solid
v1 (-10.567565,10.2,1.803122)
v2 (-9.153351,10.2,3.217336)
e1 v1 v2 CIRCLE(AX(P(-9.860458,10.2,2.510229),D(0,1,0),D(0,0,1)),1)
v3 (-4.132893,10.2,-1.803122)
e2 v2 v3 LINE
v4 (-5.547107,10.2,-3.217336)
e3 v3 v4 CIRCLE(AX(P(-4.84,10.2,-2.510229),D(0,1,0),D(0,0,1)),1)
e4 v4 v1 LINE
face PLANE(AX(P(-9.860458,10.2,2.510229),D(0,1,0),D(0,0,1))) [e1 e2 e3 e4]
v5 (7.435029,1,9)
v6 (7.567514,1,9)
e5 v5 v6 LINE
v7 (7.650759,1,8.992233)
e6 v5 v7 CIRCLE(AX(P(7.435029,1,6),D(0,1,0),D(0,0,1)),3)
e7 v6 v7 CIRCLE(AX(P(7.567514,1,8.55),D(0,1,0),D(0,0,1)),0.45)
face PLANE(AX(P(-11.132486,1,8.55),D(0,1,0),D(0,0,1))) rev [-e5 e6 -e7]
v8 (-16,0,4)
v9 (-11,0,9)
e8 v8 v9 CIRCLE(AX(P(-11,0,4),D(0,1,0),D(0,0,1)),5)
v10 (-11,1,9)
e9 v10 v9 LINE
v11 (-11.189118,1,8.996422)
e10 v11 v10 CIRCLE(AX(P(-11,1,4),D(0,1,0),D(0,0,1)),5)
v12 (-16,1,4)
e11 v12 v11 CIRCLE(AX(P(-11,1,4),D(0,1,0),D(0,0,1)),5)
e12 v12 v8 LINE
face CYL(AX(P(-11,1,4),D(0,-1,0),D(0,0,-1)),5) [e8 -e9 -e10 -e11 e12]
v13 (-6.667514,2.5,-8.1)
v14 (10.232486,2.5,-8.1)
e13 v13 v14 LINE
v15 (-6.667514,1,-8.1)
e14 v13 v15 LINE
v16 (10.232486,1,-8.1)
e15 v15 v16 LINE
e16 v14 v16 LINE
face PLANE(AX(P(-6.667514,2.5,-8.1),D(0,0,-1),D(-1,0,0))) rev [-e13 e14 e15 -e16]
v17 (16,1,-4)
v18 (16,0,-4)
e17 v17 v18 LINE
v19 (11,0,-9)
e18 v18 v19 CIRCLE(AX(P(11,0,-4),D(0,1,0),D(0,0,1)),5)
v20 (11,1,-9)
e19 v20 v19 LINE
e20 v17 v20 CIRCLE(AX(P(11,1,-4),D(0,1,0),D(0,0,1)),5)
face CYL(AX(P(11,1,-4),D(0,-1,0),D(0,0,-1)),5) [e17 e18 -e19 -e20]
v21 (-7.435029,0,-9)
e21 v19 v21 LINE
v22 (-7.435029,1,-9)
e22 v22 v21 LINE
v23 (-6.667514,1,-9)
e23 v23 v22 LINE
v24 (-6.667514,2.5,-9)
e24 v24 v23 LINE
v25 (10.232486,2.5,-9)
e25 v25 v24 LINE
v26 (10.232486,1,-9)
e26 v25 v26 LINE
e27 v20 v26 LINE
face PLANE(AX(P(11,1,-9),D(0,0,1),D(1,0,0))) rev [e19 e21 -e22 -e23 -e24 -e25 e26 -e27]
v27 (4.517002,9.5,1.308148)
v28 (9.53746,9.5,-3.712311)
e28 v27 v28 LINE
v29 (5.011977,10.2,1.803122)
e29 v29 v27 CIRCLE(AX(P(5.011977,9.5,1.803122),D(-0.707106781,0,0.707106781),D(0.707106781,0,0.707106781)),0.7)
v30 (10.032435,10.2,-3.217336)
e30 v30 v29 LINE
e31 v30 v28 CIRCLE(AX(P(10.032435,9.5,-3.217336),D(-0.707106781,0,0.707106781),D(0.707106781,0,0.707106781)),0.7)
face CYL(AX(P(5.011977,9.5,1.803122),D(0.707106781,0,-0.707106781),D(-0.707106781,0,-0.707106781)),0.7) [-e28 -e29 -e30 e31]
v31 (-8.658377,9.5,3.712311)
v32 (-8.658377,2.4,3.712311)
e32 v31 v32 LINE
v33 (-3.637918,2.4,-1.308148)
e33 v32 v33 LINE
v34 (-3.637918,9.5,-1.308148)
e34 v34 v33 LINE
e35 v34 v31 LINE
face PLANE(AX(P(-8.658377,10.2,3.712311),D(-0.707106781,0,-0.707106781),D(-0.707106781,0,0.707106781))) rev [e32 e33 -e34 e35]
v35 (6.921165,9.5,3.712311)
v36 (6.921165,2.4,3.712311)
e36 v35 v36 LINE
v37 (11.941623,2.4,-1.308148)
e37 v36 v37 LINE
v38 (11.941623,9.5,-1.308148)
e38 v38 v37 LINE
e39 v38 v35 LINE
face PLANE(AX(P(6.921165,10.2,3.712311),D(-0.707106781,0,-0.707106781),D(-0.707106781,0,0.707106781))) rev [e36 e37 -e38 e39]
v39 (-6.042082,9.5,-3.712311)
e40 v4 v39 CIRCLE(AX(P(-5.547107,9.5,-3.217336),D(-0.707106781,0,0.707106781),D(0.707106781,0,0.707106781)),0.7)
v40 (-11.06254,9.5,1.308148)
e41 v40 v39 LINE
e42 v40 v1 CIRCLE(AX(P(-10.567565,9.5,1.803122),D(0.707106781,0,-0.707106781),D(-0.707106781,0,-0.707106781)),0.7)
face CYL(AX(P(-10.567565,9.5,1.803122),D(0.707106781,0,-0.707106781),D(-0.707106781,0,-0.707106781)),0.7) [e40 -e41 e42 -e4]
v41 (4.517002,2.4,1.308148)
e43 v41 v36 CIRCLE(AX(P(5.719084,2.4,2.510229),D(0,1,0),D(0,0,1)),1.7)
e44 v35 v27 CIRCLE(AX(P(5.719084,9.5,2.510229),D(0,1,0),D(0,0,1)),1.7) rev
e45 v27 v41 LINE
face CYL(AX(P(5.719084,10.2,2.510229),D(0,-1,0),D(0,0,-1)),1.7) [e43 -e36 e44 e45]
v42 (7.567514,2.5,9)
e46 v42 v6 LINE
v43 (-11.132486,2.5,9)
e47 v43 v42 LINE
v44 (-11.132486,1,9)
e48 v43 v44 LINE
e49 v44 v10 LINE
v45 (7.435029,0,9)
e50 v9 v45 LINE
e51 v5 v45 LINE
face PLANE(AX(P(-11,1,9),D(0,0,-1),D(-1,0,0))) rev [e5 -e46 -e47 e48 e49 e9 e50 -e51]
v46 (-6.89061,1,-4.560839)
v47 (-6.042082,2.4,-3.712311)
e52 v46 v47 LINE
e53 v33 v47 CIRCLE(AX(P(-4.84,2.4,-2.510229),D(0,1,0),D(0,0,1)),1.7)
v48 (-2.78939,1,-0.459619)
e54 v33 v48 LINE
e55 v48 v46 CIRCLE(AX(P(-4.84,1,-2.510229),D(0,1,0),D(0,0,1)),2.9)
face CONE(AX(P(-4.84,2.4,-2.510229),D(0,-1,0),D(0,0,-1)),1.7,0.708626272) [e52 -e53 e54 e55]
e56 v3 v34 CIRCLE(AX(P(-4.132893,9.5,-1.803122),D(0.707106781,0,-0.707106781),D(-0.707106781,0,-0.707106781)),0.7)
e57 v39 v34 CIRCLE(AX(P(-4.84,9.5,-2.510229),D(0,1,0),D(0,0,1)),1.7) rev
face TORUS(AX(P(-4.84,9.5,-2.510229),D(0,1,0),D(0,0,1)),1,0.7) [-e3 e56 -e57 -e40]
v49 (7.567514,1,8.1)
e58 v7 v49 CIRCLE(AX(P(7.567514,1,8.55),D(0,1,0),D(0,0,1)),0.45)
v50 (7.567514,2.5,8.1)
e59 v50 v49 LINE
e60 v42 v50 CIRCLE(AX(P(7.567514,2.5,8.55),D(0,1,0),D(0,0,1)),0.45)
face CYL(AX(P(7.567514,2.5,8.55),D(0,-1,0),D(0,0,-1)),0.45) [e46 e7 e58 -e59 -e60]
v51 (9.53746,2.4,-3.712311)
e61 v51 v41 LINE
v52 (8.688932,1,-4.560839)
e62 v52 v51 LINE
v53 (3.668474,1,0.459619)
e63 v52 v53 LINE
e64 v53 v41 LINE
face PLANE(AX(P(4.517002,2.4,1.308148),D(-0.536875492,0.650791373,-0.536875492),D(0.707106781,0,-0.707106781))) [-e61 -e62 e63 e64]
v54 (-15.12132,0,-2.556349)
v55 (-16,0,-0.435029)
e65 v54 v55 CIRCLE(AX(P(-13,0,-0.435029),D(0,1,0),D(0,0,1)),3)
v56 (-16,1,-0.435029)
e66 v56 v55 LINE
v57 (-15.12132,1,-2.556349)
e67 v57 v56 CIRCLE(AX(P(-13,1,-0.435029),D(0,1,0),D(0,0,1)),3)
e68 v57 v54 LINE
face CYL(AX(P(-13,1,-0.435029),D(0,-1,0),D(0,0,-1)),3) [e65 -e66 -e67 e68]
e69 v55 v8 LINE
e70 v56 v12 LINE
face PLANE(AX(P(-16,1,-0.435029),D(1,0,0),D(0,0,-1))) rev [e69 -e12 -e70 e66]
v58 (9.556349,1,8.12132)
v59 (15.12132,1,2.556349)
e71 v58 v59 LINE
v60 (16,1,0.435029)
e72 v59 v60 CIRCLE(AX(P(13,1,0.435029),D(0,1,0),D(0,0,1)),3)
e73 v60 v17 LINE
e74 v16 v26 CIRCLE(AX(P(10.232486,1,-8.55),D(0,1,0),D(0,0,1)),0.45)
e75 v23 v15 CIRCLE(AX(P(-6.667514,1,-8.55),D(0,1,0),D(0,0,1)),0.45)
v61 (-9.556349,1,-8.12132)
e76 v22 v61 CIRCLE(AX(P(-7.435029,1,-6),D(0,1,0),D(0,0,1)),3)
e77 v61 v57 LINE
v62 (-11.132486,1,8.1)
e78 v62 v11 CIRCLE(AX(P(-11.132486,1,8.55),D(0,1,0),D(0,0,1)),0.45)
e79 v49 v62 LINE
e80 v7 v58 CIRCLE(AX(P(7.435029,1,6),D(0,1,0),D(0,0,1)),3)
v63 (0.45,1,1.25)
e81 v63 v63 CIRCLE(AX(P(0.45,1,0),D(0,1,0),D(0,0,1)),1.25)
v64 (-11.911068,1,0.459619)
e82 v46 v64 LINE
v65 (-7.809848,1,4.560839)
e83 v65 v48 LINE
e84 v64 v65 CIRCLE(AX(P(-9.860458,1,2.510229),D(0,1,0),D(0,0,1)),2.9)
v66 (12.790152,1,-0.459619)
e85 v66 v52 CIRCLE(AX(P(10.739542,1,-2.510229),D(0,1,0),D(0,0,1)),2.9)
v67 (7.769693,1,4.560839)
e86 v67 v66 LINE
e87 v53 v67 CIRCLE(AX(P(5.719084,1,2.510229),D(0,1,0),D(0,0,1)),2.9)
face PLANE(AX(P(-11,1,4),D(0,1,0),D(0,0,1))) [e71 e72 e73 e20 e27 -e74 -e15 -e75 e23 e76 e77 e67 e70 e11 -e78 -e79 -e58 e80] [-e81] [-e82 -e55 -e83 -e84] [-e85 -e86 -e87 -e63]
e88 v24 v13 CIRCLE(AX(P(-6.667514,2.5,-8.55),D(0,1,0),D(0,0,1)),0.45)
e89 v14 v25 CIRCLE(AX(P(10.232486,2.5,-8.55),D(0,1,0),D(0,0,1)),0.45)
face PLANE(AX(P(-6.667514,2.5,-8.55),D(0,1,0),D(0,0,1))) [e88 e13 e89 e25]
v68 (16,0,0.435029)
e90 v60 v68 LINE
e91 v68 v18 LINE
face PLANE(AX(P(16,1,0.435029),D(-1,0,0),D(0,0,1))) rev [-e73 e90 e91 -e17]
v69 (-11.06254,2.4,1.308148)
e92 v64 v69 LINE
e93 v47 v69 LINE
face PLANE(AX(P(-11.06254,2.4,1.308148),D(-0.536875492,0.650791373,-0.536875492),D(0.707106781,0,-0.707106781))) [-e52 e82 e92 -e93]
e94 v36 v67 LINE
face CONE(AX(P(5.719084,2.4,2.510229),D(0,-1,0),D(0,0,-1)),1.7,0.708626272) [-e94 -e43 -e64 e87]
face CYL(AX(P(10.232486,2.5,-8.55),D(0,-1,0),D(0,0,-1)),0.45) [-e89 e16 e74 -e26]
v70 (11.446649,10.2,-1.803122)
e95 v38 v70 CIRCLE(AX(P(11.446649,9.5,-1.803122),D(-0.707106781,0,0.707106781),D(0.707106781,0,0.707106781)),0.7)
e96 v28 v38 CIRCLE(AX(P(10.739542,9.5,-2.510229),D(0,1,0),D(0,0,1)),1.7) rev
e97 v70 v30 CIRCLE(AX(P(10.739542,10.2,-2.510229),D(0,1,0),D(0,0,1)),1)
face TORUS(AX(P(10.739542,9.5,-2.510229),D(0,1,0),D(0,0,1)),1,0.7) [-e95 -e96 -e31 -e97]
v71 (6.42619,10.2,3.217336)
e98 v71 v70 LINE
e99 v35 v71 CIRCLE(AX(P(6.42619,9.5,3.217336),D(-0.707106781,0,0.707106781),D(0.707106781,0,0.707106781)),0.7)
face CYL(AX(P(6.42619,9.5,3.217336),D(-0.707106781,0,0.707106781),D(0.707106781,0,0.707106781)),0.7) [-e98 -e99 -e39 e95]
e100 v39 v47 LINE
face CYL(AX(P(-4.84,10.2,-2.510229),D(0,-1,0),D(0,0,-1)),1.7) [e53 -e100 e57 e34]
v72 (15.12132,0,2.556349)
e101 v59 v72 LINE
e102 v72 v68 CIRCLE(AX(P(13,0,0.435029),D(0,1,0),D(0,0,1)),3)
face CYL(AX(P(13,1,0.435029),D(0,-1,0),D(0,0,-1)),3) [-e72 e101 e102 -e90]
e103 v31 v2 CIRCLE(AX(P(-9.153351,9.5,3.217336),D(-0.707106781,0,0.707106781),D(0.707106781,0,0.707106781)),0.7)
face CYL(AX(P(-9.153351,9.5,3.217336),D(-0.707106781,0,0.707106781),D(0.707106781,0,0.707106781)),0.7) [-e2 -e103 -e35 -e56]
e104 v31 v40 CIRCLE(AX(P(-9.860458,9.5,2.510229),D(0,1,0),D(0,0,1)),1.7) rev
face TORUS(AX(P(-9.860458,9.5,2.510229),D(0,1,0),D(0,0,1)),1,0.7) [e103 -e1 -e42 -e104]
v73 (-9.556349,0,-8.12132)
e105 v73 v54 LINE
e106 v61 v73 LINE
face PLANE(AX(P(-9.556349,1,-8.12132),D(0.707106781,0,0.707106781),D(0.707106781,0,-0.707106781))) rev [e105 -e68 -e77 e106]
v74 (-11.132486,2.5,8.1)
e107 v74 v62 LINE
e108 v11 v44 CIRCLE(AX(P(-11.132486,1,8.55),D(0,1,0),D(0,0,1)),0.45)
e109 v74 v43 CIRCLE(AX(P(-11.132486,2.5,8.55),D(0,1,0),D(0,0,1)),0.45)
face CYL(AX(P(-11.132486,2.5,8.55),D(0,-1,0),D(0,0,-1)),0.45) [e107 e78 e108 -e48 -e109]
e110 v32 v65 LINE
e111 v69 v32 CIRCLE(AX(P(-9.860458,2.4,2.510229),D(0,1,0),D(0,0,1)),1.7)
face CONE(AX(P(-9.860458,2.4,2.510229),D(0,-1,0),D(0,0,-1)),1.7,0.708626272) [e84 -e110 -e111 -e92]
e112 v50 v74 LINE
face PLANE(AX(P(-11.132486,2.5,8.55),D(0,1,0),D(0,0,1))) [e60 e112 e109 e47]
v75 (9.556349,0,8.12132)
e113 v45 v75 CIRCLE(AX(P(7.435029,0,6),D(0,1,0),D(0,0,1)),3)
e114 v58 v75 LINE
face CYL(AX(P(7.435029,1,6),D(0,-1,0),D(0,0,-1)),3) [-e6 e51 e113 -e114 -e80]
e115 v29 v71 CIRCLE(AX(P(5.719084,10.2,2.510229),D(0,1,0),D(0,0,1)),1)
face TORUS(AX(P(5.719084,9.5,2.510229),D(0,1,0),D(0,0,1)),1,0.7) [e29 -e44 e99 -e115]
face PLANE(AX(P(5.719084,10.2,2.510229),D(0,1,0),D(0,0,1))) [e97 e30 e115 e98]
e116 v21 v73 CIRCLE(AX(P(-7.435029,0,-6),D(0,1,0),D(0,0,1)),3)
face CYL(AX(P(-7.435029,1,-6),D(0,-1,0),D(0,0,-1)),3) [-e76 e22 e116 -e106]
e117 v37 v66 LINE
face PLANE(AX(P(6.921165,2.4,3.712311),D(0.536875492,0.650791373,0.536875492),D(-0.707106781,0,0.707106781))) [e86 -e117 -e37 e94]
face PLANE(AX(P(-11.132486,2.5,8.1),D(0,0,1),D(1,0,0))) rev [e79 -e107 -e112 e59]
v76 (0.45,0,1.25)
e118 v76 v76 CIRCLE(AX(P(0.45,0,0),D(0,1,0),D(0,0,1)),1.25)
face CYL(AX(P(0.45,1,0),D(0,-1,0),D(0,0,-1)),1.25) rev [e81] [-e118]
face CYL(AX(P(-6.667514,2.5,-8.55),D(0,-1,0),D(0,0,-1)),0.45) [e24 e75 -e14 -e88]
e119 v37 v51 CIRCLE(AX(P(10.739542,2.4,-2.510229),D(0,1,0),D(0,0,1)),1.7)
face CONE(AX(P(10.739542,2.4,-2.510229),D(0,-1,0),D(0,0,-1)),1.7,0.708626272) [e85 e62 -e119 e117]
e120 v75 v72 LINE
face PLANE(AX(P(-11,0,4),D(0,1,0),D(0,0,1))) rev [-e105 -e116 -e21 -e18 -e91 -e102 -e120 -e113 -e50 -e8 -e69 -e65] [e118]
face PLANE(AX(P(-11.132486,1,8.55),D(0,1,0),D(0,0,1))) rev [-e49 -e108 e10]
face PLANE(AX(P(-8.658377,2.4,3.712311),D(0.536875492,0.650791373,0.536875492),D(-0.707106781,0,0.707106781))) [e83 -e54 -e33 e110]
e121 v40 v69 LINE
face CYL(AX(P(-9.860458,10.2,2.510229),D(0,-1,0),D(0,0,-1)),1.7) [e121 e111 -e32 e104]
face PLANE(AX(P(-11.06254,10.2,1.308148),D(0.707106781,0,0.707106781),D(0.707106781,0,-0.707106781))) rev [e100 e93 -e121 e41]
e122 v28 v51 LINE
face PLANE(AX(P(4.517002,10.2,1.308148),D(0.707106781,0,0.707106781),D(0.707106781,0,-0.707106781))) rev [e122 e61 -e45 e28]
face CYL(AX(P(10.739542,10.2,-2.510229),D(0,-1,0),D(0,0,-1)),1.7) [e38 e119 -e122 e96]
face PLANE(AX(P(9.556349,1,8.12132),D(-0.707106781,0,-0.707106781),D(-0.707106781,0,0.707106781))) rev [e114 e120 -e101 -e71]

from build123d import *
from OCP.BRepFilletAPI import BRepFilletAPI_MakeChamfer

# Parameters (mm, degrees)
ESQUISSE1_R        = 1.25
BOSS_EXTRU_1_DEPTH = 1
BOSS_EXTRU_2_DEPTH = 9.2
CONG_1_R           = 0.7
BOSS_EXTRU_3_DEPTH = 1.4
CHANFREIN1_SIZE    = 1.4
CHANFREIN1_SIZE_2  = 1.2
BOSS_EXTRU_4_DEPTH = 1.5


with BuildPart() as part:
    # Esquisse1 → Boss.-Extru.1 (new body)
    with BuildSketch(Plane(origin=(0, 0, 0), x_dir=(1, 0, 0), z_dir=(0, 1, 0))):
        with BuildLine():
            Line((-11, -9), (7.435028843, -9))
            ThreePointArc((7.435028843, -9), (8.58307914, -8.771638598), (9.556349186, -8.121320344))
            Line((9.556349186, -8.121320344), (15.121320344, -2.556349186))
            ThreePointArc((15.121320344, -2.556349186), (15.771638598, -1.58307914), (16, -0.435028843))
            Line((16, -0.435028843), (16, 4))
            ThreePointArc((16, 4), (14.535533906, 7.535533906), (11, 9))
            Line((11, 9), (-7.435028843, 9))
            ThreePointArc((-7.435028843, 9), (-8.58307914, 8.771638598), (-9.556349186, 8.121320344))
            Line((-9.556349186, 8.121320344), (-15.121320344, 2.556349186))
            ThreePointArc((-15.121320344, 2.556349186), (-15.771638598, 1.58307914), (-16, 0.435028843))
            Line((-16, 0.435028843), (-16, -4))
            ThreePointArc((-16, -4), (-14.535533906, -7.535533906), (-11, -9))
        make_face()
        with Locations(Location((0.45, 0, 0), (0, 0, 270))):
            Circle(ESQUISSE1_R, mode=Mode.SUBTRACT)
    extrude(amount=BOSS_EXTRU_1_DEPTH)

    # Esquisse2 → Boss.-Extru.2 (add)
    with BuildSketch(Plane(origin=(0, 1, 0), x_dir=(1, 0, 0), z_dir=(0, 1, 0))):
        with BuildLine():
            Line((-11.062539674, -1.308147545), (-6.042081528, 3.712310601))
            ThreePointArc((-6.042081528, 3.712310601), (-3.637918472, 3.712310601), (-3.637918472, 1.308147545))
            Line((-3.637918472, 1.308147545), (-8.658376618, -3.712310601))
            ThreePointArc((-8.658376618, -3.712310601), (-11.062539674, -3.712310601), (-11.062539674, -1.308147545))
        make_face()
        with BuildLine():
            Line((4.517002179, -1.308147545), (9.537460326, 3.712310601))
            ThreePointArc((9.537460326, 3.712310601), (11.941623382, 3.712310601), (11.941623382, 1.308147545))
            Line((11.941623382, 1.308147545), (6.921165235, -3.712310601))
            ThreePointArc((6.921165235, -3.712310601), (4.517002179, -3.712310601), (4.517002179, -1.308147545))
        make_face()
    extrude(amount=BOSS_EXTRU_2_DEPTH)

    # Congé1
    cong_1_edges = [part.edges().sort_by_distance(p)[0] for p in [
        (-11.062539674, 10.2, 3.712310601),
        (-6.148147545, 10.2, 1.202081528),
        (-3.637918472, 10.2, -3.712310601),
        (-8.552310601, 10.2, -1.202081528),
        (4.517002179, 10.2, 3.712310601),
        (9.431394308, 10.2, 1.202081528),
        (11.941623382, 10.2, -3.712310601),
        (7.027231252, 10.2, -1.202081528),
    ]]
    fillet(cong_1_edges, radius=CONG_1_R)

    # Esquisse3 → Boss.-Extru.3 (add)
    with BuildSketch(Plane(origin=(0, 1, 0), x_dir=(1, 0, 0), z_dir=(0, 1, 0))):
        with BuildLine():
            Line((-11.911067812, -0.459619408), (-6.890609665, 4.560838739))
            ThreePointArc((-6.890609665, 4.560838739), (-2.789390335, 4.560838739), (-2.789390335, 0.459619408))
            Line((-2.789390335, 0.459619408), (-7.809848481, -4.560838739))
            ThreePointArc((-7.809848481, -4.560838739), (-11.911067812, -4.560838739), (-11.911067812, -0.459619408))
        make_face()
        with BuildLine():
            Line((3.668474042, -0.459619408), (8.688932188, 4.560838739))
            ThreePointArc((8.688932188, 4.560838739), (12.790151519, 4.560838739), (12.790151519, 0.459619408))
            Line((12.790151519, 0.459619408), (7.769693373, -4.560838739))
            ThreePointArc((7.769693373, -4.560838739), (3.668474042, -4.560838739), (3.668474042, -0.459619408))
        make_face()
    extrude(amount=BOSS_EXTRU_3_DEPTH)

    # Chanfrein1
    chanfrein1_edges_1 = [part.edges().sort_by_distance(p)[0] for p in [
        (12.790151519, 2.4, -4.560838739),
    ]]
    chanfrein1_side_1 = [part.faces().sort_by_distance(p)[0] for p in [
        (12.790151519, 2.376, -4.560838739),
    ]]
    chanfrein1_edges_2 = [part.edges().sort_by_distance(p)[0] for p in [
        (6.178703115, 2.4, -2.050609665),
    ]]
    chanfrein1_side_2 = [part.faces().sort_by_distance(p)[0] for p in [
        (6.178703115, 2.376, -2.050609665),
    ]]
    chanfrein1_edges_3 = [part.edges().sort_by_distance(p)[0] for p in [
        (3.668474042, 2.4, 4.560838739),
    ]]
    chanfrein1_side_3 = [part.faces().sort_by_distance(p)[0] for p in [
        (3.668474042, 2.376, 4.560838739),
    ]]
    chanfrein1_edges_4 = [part.edges().sort_by_distance(p)[0] for p in [
        (10.279922446, 2.4, 2.050609665),
    ]]
    chanfrein1_side_4 = [part.faces().sort_by_distance(p)[0] for p in [
        (10.279922446, 2.376, 2.050609665),
    ]]
    chanfrein1_edges_5 = [part.edges().sort_by_distance(p)[0] for p in [
        (-2.789390335, 2.4, -4.560838739),
    ]]
    chanfrein1_side_5 = [part.faces().sort_by_distance(p)[0] for p in [
        (-2.789390335, 2.376, -4.560838739),
    ]]
    chanfrein1_edges_6 = [part.edges().sort_by_distance(p)[0] for p in [
        (-9.400838739, 2.4, -2.050609665),
    ]]
    chanfrein1_side_6 = [part.faces().sort_by_distance(p)[0] for p in [
        (-9.400838739, 2.376, -2.050609665),
    ]]
    chanfrein1_edges_7 = [part.edges().sort_by_distance(p)[0] for p in [
        (-11.911067812, 2.4, 4.560838739),
    ]]
    chanfrein1_side_7 = [part.faces().sort_by_distance(p)[0] for p in [
        (-11.911067812, 2.376, 4.560838739),
    ]]
    chanfrein1_edges_8 = [part.edges().sort_by_distance(p)[0] for p in [
        (-5.299619408, 2.4, 2.050609665),
    ]]
    chanfrein1_side_8 = [part.faces().sort_by_distance(p)[0] for p in [
        (-5.299619408, 2.376, 2.050609665),
    ]]
    chanfrein1 = BRepFilletAPI_MakeChamfer(part.part.solid().wrapped)
    for e in chanfrein1_edges_1:
        chanfrein1.Add(CHANFREIN1_SIZE - 0.0001, CHANFREIN1_SIZE_2 - 0.0001, e.wrapped, chanfrein1_side_1[0].wrapped)
    for e in chanfrein1_edges_2:
        chanfrein1.Add(CHANFREIN1_SIZE - 0.0001, CHANFREIN1_SIZE_2 - 0.0001, e.wrapped, chanfrein1_side_2[0].wrapped)
    for e in chanfrein1_edges_3:
        chanfrein1.Add(CHANFREIN1_SIZE - 0.0001, CHANFREIN1_SIZE_2 - 0.0001, e.wrapped, chanfrein1_side_3[0].wrapped)
    for e in chanfrein1_edges_4:
        chanfrein1.Add(CHANFREIN1_SIZE - 0.0001, CHANFREIN1_SIZE_2 - 0.0001, e.wrapped, chanfrein1_side_4[0].wrapped)
    for e in chanfrein1_edges_5:
        chanfrein1.Add(CHANFREIN1_SIZE - 0.0001, CHANFREIN1_SIZE_2 - 0.0001, e.wrapped, chanfrein1_side_5[0].wrapped)
    for e in chanfrein1_edges_6:
        chanfrein1.Add(CHANFREIN1_SIZE - 0.0001, CHANFREIN1_SIZE_2 - 0.0001, e.wrapped, chanfrein1_side_6[0].wrapped)
    for e in chanfrein1_edges_7:
        chanfrein1.Add(CHANFREIN1_SIZE - 0.0001, CHANFREIN1_SIZE_2 - 0.0001, e.wrapped, chanfrein1_side_7[0].wrapped)
    for e in chanfrein1_edges_8:
        chanfrein1.Add(CHANFREIN1_SIZE - 0.0001, CHANFREIN1_SIZE_2 - 0.0001, e.wrapped, chanfrein1_side_8[0].wrapped)
    add(Compound.cast(chanfrein1.Shape()), mode=Mode.REPLACE)  # a hair under: the kernel refuses the full size

    # Esquisse4 → Boss.-Extru.4 (add)
    with BuildSketch(Plane(origin=(0, 1, 0), x_dir=(1, 0, 0), z_dir=(0, 1, 0))):
        with BuildLine():
            Line((-6.667514421, 9), (10.232485579, 9))
            ThreePointArc((10.232485579, 9), (10.682485579, 8.55), (10.232485579, 8.1))
            Line((10.232485579, 8.1), (-6.667514421, 8.1))
            ThreePointArc((-6.667514421, 8.1), (-7.117514421, 8.55), (-6.667514421, 9))
        make_face()
        with BuildLine():
            Line((-11.132485579, -8.1), (7.567514421, -8.1))
            ThreePointArc((7.567514421, -8.1), (8.017514421, -8.55), (7.567514421, -9))
            Line((7.567514421, -9), (-11.132485579, -9))
            ThreePointArc((-11.132485579, -9), (-11.582485579, -8.55), (-11.132485579, -8.1))
        make_face()
    extrude(amount=BOSS_EXTRU_4_DEPTH)


solid = part.part
